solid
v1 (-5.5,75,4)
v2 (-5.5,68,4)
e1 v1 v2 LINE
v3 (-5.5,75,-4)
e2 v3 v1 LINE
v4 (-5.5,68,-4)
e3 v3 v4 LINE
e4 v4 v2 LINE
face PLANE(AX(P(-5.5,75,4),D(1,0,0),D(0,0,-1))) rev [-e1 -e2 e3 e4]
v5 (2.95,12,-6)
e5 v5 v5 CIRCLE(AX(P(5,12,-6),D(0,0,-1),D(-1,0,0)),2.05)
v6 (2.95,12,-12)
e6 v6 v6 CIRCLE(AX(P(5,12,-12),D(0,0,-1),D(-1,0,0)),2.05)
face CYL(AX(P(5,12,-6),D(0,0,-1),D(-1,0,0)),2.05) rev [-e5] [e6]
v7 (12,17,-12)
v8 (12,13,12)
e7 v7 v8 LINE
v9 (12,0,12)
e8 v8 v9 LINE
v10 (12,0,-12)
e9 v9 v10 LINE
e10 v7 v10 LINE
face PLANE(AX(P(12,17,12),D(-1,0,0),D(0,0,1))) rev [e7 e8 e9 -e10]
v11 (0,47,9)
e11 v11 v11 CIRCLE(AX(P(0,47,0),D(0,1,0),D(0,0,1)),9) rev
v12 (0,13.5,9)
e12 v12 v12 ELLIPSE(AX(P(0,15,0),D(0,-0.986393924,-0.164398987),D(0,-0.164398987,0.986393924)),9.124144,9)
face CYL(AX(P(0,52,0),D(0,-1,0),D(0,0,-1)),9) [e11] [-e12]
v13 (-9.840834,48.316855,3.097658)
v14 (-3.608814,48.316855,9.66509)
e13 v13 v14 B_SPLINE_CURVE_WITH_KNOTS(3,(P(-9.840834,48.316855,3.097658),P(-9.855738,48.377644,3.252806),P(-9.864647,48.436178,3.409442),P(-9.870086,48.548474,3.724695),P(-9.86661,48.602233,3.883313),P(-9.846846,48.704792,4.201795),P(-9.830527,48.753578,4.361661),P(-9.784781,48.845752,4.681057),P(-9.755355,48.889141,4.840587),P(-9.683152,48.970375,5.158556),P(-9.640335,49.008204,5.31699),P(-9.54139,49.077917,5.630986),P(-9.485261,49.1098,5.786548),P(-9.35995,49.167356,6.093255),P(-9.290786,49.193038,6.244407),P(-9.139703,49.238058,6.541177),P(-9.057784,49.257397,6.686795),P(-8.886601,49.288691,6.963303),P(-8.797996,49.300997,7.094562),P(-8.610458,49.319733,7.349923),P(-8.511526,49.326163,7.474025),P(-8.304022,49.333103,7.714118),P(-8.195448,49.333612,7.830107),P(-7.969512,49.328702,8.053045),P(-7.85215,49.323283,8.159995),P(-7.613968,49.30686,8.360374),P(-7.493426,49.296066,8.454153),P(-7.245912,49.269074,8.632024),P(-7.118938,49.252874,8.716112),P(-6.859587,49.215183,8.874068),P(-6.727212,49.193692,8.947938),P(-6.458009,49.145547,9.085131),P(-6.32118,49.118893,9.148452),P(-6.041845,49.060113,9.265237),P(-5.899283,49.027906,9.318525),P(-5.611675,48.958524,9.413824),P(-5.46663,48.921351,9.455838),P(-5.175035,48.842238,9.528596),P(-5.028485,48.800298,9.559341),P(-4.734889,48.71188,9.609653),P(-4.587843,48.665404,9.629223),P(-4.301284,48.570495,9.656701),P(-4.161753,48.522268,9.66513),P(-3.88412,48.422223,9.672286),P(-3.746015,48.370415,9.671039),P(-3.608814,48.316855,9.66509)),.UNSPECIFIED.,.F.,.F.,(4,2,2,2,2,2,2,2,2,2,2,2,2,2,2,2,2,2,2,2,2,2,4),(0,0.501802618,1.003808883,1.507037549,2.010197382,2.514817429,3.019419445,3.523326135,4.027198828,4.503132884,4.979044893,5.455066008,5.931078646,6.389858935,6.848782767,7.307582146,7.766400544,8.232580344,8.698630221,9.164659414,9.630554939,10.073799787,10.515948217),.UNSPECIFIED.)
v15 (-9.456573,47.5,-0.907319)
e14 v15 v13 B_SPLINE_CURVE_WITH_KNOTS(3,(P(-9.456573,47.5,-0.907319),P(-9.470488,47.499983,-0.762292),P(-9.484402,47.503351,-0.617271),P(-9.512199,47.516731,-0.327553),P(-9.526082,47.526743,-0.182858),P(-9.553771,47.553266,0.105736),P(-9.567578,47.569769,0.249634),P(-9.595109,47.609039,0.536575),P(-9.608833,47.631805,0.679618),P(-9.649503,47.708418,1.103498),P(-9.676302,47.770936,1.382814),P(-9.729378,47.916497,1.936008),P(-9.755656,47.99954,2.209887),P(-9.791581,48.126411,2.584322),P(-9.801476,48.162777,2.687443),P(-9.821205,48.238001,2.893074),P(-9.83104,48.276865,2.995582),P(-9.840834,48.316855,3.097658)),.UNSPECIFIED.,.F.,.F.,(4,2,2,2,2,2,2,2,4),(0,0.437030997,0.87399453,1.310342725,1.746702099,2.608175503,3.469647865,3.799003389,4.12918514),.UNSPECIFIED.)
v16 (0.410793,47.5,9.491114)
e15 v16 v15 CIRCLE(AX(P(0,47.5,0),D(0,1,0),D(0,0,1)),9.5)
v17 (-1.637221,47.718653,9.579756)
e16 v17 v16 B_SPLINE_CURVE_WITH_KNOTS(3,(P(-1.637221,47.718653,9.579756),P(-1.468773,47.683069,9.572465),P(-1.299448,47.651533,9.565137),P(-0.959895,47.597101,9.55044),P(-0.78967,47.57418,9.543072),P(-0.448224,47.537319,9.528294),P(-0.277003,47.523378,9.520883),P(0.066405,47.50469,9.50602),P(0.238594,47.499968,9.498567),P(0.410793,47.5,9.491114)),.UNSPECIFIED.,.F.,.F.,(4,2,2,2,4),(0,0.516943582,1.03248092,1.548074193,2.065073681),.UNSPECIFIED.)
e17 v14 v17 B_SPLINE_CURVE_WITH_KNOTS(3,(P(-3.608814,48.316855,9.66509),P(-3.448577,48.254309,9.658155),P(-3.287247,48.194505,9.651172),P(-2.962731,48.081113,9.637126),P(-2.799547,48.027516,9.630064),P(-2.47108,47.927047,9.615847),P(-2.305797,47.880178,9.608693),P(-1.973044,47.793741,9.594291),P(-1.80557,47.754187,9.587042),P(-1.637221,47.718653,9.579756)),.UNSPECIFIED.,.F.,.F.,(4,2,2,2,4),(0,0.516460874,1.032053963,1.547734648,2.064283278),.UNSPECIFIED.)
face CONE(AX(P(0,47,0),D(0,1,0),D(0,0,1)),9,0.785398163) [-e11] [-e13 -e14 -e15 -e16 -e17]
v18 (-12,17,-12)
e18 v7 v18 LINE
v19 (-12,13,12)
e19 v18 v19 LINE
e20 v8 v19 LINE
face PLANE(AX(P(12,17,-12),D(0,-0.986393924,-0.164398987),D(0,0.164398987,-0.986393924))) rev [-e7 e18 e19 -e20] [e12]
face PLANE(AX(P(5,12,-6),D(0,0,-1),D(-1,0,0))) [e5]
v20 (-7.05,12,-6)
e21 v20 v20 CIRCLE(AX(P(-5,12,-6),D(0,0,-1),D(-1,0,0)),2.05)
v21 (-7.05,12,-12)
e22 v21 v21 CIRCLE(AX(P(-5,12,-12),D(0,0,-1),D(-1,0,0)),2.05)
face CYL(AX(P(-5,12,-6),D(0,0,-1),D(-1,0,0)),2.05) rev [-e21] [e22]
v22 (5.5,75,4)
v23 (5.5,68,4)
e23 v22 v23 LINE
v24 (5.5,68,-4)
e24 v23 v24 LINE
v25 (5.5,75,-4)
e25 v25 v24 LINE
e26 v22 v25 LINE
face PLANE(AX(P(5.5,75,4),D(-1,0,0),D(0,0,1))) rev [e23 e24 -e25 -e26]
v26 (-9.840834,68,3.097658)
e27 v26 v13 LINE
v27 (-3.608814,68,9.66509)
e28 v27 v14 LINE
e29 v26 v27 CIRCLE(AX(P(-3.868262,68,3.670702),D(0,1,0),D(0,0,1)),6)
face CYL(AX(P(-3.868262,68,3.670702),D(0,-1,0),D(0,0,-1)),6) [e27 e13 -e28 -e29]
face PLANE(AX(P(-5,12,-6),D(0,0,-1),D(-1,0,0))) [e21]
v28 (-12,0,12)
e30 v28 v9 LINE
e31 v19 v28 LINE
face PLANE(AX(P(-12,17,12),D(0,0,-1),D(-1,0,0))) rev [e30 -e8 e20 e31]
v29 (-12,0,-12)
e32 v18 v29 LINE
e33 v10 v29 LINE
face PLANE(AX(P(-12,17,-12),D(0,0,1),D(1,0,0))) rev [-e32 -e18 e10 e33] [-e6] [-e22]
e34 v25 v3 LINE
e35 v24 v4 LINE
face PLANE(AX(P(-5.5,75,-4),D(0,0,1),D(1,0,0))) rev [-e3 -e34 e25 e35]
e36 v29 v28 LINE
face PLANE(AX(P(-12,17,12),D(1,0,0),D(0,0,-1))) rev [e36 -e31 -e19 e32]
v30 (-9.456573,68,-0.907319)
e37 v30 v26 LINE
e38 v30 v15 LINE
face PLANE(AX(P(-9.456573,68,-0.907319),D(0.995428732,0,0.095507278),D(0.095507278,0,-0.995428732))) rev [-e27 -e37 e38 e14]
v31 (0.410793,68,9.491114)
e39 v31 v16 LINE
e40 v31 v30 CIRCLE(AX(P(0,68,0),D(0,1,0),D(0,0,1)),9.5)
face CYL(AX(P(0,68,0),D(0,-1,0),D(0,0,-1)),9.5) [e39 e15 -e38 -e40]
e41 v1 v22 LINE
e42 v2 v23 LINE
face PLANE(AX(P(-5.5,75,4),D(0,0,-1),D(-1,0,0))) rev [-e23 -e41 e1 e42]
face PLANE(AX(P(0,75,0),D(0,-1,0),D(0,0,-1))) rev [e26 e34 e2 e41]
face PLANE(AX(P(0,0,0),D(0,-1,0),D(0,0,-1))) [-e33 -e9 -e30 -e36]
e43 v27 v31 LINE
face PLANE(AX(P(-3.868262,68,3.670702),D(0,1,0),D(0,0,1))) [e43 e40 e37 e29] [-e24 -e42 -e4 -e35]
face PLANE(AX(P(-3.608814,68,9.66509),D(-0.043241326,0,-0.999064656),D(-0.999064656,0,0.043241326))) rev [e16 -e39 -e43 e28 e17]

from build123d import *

# Parameters (mm, degrees)
SKETCH1_W           = 24
SKETCH1_H           = 24
BOSS_EXTRUDE1_DEPTH = 17
CUT_EXTRUDE1_DEPTH  = 32.764760349
SKETCH3_R           = 9
BOSS_EXTRUDE2_DEPTH = 52
BOSS_EXTRUDE3_DEPTH = 16
CHAMFER1_START      = 46.9999999
CHAMFER1_OUTLINE_R  = 9
CHAMFER1_DEPTH      = 5.0000001
SKETCH5_W           = 11
SKETCH5_H           = 8
BOSS_EXTRUDE4_DEPTH = 7
SKETCH6_R           = 2.05
CUT_EXTRUDE2_DEPTH  = 6


with BuildPart() as part:
    # Sketch1 → Boss-Extrude1 (new body)
    with BuildSketch(Plane(origin=(0, 0, 0), x_dir=(1, 0, 0), z_dir=(0, 1, 0))):
        Rectangle(SKETCH1_W, SKETCH1_H)
    extrude(amount=BOSS_EXTRUDE1_DEPTH)

    # Sketch2 → Cut-Extrude1 (cut, through all)
    with BuildSketch(Plane.ZY.offset(12)):
        Polygon((-12, 17), (12, 13), (12, 17), align=None)
    extrude(amount=-CUT_EXTRUDE1_DEPTH, mode=Mode.SUBTRACT)

    # Sketch3 → Boss-Extrude2 (add)
    with BuildSketch(Plane.XZ):
        with Locations(Location((0, 0, 0), (0, 0, 270))):
            Circle(SKETCH3_R)
    extrude(amount=-BOSS_EXTRUDE2_DEPTH)

    # Sketch4 → Boss-Extrude3 (add)
    with BuildSketch(Plane(origin=(0, 52, 0), x_dir=(1, 0, 0), z_dir=(0, 1, 0))):
        with BuildLine():
            Line((-9.456572951, 0.90731914), (-9.84083402, -3.097658461))
            ThreePointArc((-9.84083402, -3.097658461), (-8.220587121, -7.800746053), (-3.608813676, -9.665090067))
            Line((-3.608813676, -9.665090067), (0.410792593, -9.491114236))
            ThreePointArc((0.410792593, -9.491114236), (6.891182028, 6.539236214), (-9.456572951, 0.90731914))
        make_face()
    extrude(amount=BOSS_EXTRUDE3_DEPTH)

    # Chamfer1: read off the stored shape, not the designer's step
    # Chamfer1 outline → Chamfer1 (add)
    with BuildSketch(Plane(origin=(0, 0, 0), x_dir=(1, 0, 0), z_dir=(0, 1, 0)).offset(CHAMFER1_START)):
        with BuildLine():
            ThreePointArc((-9.84083402, -3.097658461), (-8.220587121, -7.800746053), (-3.608813676, -9.665090067))
            Line((-3.608813676, -9.665090067), (0.410792593, -9.491114236))
            ThreePointArc((0.410792593, -9.491114236), (6.891182028, 6.539236214), (-9.456572951, 0.90731914))
            Line((-9.456572951, 0.90731914), (-9.84083402, -3.097658461))
        make_face()
        Circle(CHAMFER1_OUTLINE_R, mode=Mode.SUBTRACT)
    extrude(amount=CHAMFER1_DEPTH)

    # Chamfer1 2 outline → Chamfer1 2 (revolve, cut)
    with BuildSketch(Plane.XY):
        Polygon((11.332682454, 49.332682454), (9, 47), (11.332682454, 46.9999999), align=None)
    revolve(axis=Axis((0, 0, 0), (0, 1, 0)), mode=Mode.SUBTRACT)

    # Sketch5 → Boss-Extrude4 (add)
    with BuildSketch(Plane(origin=(0, 68, 0), x_dir=(1, 0, 0), z_dir=(0, 1, 0))):
        Rectangle(SKETCH5_W, SKETCH5_H)
    extrude(amount=BOSS_EXTRUDE4_DEPTH)

    # Sketch6 → Cut-Extrude2 (cut)
    with BuildSketch(Plane(origin=(0, 0, -12), x_dir=(-1, 0, 0), z_dir=(0, 0, -1))):
        with Locations((5, 12)):
            Circle(SKETCH6_R)
        with Locations((-5, 12)):
            Circle(SKETCH6_R)
    extrude(amount=-CUT_EXTRUDE2_DEPTH, mode=Mode.SUBTRACT)


solid = part.part
